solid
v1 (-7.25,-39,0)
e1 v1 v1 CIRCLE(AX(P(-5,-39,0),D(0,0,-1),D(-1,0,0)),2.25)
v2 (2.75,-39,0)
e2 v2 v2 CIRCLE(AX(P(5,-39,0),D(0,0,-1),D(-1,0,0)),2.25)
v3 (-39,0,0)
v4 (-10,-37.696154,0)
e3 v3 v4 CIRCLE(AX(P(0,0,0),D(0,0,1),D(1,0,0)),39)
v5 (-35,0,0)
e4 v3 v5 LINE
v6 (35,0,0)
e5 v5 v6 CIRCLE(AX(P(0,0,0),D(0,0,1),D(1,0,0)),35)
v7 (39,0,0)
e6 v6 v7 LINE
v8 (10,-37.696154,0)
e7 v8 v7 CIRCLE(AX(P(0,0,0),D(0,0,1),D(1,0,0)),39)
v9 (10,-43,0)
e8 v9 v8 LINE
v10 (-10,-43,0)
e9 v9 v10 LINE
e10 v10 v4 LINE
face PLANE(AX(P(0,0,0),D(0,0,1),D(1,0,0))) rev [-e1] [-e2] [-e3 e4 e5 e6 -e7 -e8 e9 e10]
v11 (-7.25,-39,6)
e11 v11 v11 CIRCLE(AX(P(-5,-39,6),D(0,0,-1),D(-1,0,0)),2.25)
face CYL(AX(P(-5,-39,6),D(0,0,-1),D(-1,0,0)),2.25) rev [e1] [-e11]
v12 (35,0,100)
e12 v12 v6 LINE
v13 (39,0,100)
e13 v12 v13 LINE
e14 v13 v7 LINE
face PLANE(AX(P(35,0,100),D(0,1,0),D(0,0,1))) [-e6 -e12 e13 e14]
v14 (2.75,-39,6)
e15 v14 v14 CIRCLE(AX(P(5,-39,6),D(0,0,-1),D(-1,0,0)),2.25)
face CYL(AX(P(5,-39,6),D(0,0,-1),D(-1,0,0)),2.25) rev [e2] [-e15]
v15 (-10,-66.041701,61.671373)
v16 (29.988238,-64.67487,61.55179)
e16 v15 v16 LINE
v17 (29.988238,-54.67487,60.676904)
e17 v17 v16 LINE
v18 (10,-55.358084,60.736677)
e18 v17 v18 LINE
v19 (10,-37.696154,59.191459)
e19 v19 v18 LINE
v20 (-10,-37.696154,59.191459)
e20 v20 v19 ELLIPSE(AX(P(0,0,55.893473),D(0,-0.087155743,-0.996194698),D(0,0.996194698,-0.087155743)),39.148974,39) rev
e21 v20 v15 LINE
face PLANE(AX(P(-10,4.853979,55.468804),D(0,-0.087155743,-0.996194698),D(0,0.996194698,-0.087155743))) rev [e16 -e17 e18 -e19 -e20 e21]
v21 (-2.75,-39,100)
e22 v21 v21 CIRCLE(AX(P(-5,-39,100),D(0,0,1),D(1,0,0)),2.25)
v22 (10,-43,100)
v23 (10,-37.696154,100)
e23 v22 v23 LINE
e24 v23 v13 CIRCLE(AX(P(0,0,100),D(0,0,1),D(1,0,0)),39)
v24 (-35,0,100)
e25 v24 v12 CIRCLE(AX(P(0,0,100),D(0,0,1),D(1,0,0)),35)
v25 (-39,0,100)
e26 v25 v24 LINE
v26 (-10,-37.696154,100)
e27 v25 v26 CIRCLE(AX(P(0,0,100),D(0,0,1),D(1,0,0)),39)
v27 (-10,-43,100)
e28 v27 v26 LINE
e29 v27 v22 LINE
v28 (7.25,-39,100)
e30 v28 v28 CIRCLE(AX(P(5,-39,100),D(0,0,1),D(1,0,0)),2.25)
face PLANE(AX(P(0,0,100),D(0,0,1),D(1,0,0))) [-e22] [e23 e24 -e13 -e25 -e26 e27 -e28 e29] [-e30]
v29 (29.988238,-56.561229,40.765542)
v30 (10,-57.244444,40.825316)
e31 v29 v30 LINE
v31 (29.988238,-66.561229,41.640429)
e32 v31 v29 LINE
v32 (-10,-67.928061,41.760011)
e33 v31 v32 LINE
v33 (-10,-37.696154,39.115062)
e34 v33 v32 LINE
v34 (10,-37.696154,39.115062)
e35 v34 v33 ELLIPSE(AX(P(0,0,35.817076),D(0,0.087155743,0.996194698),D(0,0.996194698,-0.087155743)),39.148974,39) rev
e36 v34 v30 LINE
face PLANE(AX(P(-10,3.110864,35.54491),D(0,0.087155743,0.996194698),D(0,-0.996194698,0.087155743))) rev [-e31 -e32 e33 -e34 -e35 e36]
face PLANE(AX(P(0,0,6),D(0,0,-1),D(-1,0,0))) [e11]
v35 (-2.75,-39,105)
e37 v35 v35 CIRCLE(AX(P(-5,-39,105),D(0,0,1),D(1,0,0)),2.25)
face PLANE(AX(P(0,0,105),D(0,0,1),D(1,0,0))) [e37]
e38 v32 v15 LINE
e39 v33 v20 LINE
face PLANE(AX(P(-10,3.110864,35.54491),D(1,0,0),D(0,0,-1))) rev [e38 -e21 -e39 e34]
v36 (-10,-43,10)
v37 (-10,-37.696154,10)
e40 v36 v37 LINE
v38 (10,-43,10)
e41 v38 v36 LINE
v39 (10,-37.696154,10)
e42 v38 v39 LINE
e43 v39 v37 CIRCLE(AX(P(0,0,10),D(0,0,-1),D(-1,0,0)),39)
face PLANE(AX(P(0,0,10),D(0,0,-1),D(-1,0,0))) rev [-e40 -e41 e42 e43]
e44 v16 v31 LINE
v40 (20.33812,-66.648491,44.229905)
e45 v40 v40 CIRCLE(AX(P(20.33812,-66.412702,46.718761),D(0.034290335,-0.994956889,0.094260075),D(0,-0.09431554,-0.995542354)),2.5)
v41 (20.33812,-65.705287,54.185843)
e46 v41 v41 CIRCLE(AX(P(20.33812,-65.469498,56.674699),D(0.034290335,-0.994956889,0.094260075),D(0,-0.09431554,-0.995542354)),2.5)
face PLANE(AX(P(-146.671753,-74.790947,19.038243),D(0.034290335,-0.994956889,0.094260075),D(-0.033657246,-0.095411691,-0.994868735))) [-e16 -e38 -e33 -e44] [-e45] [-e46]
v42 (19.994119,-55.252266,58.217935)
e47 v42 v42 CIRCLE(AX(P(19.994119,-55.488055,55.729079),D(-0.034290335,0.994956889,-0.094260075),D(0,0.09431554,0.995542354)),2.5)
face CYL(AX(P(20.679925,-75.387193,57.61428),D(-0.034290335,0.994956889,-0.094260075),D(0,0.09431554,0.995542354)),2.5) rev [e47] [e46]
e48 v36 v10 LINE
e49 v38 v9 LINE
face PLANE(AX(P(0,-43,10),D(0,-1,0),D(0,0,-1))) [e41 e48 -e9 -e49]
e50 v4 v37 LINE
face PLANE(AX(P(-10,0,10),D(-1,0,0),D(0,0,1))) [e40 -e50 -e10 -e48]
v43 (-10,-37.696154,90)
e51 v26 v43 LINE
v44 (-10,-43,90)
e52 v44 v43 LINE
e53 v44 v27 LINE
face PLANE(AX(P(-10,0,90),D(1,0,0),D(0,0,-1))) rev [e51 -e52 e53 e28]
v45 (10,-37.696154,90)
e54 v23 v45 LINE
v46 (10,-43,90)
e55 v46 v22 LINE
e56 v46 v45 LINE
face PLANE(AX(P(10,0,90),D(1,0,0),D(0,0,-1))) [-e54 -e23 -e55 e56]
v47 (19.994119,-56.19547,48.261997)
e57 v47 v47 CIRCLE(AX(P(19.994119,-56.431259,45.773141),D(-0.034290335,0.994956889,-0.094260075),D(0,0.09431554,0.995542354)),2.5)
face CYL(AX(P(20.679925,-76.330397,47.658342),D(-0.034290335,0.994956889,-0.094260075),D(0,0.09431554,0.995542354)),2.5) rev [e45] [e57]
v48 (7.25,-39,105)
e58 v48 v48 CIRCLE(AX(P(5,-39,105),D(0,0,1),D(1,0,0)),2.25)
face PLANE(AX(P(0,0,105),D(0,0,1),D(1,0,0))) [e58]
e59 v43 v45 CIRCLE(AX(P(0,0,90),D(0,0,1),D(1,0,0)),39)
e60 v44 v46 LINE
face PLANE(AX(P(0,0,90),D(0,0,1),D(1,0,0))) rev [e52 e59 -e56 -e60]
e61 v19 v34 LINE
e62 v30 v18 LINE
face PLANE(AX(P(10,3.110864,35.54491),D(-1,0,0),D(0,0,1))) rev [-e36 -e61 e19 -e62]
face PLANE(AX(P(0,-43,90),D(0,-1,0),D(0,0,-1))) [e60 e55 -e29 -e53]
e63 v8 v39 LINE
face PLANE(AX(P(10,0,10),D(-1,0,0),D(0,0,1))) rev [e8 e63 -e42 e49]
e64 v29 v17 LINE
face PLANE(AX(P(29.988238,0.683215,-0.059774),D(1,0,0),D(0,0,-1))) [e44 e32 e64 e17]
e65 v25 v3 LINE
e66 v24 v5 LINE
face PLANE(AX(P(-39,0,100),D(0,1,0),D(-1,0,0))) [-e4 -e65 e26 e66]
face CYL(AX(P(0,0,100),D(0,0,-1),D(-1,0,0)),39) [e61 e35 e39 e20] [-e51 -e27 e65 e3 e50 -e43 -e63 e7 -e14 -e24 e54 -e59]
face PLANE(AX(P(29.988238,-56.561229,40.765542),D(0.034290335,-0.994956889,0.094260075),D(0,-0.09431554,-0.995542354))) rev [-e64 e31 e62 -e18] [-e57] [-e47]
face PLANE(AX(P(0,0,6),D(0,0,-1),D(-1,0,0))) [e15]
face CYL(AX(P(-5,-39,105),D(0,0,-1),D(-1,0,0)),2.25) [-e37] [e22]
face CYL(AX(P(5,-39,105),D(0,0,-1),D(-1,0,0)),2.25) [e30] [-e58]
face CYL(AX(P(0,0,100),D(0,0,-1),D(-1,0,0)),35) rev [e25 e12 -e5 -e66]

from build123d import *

# Parameters (mm, degrees)
EXTRUDE_THIN1_DEPTH       = 100
BOSS_EXTRUDE1_START       = -10
BOSS_EXTRUDE1_DEPTH       = 10
SKETCH3_R                 = 2.25
BOSS_EXTRUDE2_DEPTH       = 5
BOSS_EXTRUDE3_DEPTH       = 10
SKETCH5_R                 = 2.25
CUT_EXTRUDE1_DEPTH        = 6
BOSS_EXTRUDE4_REACH       = 121.416
BOSS_EXTRUDE4_END_RADIUS  = 39
SKETCH10_W                = 20
SKETCH10_H                = 20
BOSS_EXTRUDE5_START       = -19.757252304
BOSS_EXTRUDE5_OUTLINE_W   = 20
BOSS_EXTRUDE5_OUTLINE_H   = 20
BOSS_EXTRUDE5_DEPTH       = 19.757252304
BOSS_EXTRUDE5_START_2     = 71.178890271
BOSS_EXTRUDE5_2_OUTLINE_W = 23
BOSS_EXTRUDE5_2_OUTLINE_H = 23
BOSS_EXTRUDE5_2_DEPTH     = 1.821109729
BOSS_EXTRUDE6_DEPTH       = 20
SKETCH12_R                = 2.5
CUT_EXTRUDE2_DEPTH        = 20


with BuildPart() as part:
    # Sketch1 → Extrude-Thin1 (new body)
    with BuildSketch(Plane.XY):
        with BuildLine():
            ThreePointArc((-35, 0), (0, -35), (35, 0))
            Line((35, 0), (39, 0))
            ThreePointArc((39, 0), (0, -39), (-39, 0))
            Line((-39, 0), (-35, 0))
        make_face()
    extrude(amount=EXTRUDE_THIN1_DEPTH)

    # Sketch2 → Boss-Extrude1 (add)
    with BuildSketch(Plane.XY.offset(100).offset(BOSS_EXTRUDE1_START)):
        with BuildLine():
            Line((0, -39), (0, -35))
            Line((0, -35), (-10, -35))
            Line((-10, -35), (-10, -37.69615365))
            ThreePointArc((-10, -37.69615365), (-5.042321274, -38.672664715), (0, -39))
        make_face()
        with BuildLine():
            Line((10, -35), (0, -35))
            Line((0, -35), (0, -39))
            ThreePointArc((0, -39), (5.042321274, -38.672664715), (10, -37.69615365))
            Line((10, -37.69615365), (10, -35))
        make_face()
        with BuildLine():
            ThreePointArc((10, -37.69615365), (5.042321274, -38.672664715), (0, -39))
            ThreePointArc((0, -39), (-5.042321274, -38.672664715), (-10, -37.69615365))
            Line((-10, -37.69615365), (-10, -43))
            Line((-10, -43), (10, -43))
            Line((10, -43), (10, -37.69615365))
        make_face()
    extrude(amount=BOSS_EXTRUDE1_DEPTH)

    # Sketch3 → Boss-Extrude2 (add)
    with BuildSketch(Plane.XY.offset(100)):
        with Locations((-5, -39)):
            Circle(SKETCH3_R)
        with Locations((5, -39)):
            Circle(SKETCH3_R)
    extrude(amount=BOSS_EXTRUDE2_DEPTH)

    # Sketch4 → Boss-Extrude3 (add)
    with BuildSketch(Plane(origin=(0, 0, 0), x_dir=(-1, 0, 0), z_dir=(0, 0, -1))):
        with BuildLine():
            Line((0, -39), (0, -35))
            Line((0, -35), (-10, -35))
            Line((-10, -35), (-10, -37.69615365))
            ThreePointArc((-10, -37.69615365), (-5.042321274, -38.672664715), (0, -39))
        make_face()
        with BuildLine():
            ThreePointArc((10, -37.69615365), (5.042321274, -38.672664715), (0, -39))
            ThreePointArc((0, -39), (-5.042321274, -38.672664715), (-10, -37.69615365))
            Line((-10, -37.69615365), (-10, -43))
            Line((-10, -43), (10, -43))
            Line((10, -43), (10, -37.69615365))
        make_face()
        with BuildLine():
            Line((10, -35), (0, -35))
            Line((0, -35), (0, -39))
            ThreePointArc((0, -39), (5.042321274, -38.672664715), (10, -37.69615365))
            Line((10, -37.69615365), (10, -35))
        make_face()
    extrude(amount=-BOSS_EXTRUDE3_DEPTH)

    # Sketch5 → Cut-Extrude1 (cut)
    with BuildSketch(Plane(origin=(0, 0, 0), x_dir=(-1, 0, 0), z_dir=(0, 0, -1))):
        with Locations(Location((-5, -39, 0), (0, 0, 180))):
            Circle(SKETCH5_R)
        with Locations(Location((5, -39, 0), (0, 0, 180))):
            Circle(SKETCH5_R)
    extrude(amount=-CUT_EXTRUDE1_DEPTH, mode=Mode.SUBTRACT)

    # Boss-Extrude4: up to this cylinder (the profile starts outside it)
    boss_extrude4_end = Plane(origin=(0, 0, 50), z_dir=(0, 0, -1)) * Cylinder(BOSS_EXTRUDE4_END_RADIUS, 321.832, mode=Mode.PRIVATE)
    # Sketch10 → Boss-Extrude4 (add, up to the surface)
    with BuildSketch(Plane(origin=(0, -51.355775573, 4.493048169), x_dir=(1, 0, 0), z_dir=(0, 0.9961946980917462, -0.08715574274765152)), mode=Mode.PRIVATE) as boss_extrude4_sk1:
        with Locations((0, -45.680780994)):
            Rectangle(SKETCH10_W, SKETCH10_H)
    boss_extrude4_tool1 = extrude(boss_extrude4_sk1.sketch, amount=BOSS_EXTRUDE4_REACH, mode=Mode.PRIVATE) - boss_extrude4_end
    add(boss_extrude4_tool1.solids().sort_by_distance((0, -47.374433, 50))[0])

    # Boss-Extrude5: read off the stored shape, not the designer's step
    # Boss-Extrude5 outline → Boss-Extrude5 (add)
    with BuildSketch(Plane(origin=(0, -51.355775573, 4.493048169), x_dir=(1, 0, 0), z_dir=(0, 0.9961946980917462, -0.08715574274765152)).offset(BOSS_EXTRUDE5_START)):
        with Locations((0, -45.680780994)):
            Rectangle(BOSS_EXTRUDE5_OUTLINE_W, BOSS_EXTRUDE5_OUTLINE_H)
    extrude(amount=BOSS_EXTRUDE5_DEPTH)

    # Boss-Extrude5 2 outline → Boss-Extrude5 2 (cut)
    with BuildSketch(Plane(origin=(0, 0, 0), x_dir=(0.9994119135527714, 0.0341374804572781, -0.0032341114416133587), z_dir=(0.034290334626361094, -0.9949568891477218, 0.09426007473315587)).offset(BOSS_EXTRUDE5_START_2)):
        with Locations((-2.5, 45.5)):
            Rectangle(BOSS_EXTRUDE5_2_OUTLINE_W, BOSS_EXTRUDE5_2_OUTLINE_H)
    extrude(amount=BOSS_EXTRUDE5_2_DEPTH, mode=Mode.SUBTRACT)

    # Sketch11 → Boss-Extrude6 (add, along a direction that is not the sketch's normal)
    with BuildSketch(Plane(origin=(10, 0, 0), x_dir=(0, 0, -1), z_dir=(1, 0, 0))):
        Polygon((-41.700202309, -67.244443924), (-40.825315674, -57.244443924), (-60.736677348, -55.358084364), (-61.611563983, -65.358084364), align=None)
    extrude(amount=BOSS_EXTRUDE6_DEPTH, dir=(0.9994118831812419, 0.03416073136677643, -0.002988676732382235))

    # Sketch12 → Cut-Extrude2 (cut)
    with BuildSketch(Plane(origin=(2.096746102, -60.838484135, 5.763707075), x_dir=(0.9994101830326217, 0.03396190638807499, -0.005086744065644943), z_dir=(-0.03429033462636107, 0.994956889147722, -0.09426007473315641))):
        with Locations(Location((17.832976273, -40.280011427, 0), (0, 0, 269.893376297))):
            Circle(SKETCH12_R)
        with Locations(Location((17.814365976, -50.280510703, 0), (0, 0, 269.893376297))):
            Circle(SKETCH12_R)
    extrude(amount=-CUT_EXTRUDE2_DEPTH, mode=Mode.SUBTRACT)


solid = part.part
